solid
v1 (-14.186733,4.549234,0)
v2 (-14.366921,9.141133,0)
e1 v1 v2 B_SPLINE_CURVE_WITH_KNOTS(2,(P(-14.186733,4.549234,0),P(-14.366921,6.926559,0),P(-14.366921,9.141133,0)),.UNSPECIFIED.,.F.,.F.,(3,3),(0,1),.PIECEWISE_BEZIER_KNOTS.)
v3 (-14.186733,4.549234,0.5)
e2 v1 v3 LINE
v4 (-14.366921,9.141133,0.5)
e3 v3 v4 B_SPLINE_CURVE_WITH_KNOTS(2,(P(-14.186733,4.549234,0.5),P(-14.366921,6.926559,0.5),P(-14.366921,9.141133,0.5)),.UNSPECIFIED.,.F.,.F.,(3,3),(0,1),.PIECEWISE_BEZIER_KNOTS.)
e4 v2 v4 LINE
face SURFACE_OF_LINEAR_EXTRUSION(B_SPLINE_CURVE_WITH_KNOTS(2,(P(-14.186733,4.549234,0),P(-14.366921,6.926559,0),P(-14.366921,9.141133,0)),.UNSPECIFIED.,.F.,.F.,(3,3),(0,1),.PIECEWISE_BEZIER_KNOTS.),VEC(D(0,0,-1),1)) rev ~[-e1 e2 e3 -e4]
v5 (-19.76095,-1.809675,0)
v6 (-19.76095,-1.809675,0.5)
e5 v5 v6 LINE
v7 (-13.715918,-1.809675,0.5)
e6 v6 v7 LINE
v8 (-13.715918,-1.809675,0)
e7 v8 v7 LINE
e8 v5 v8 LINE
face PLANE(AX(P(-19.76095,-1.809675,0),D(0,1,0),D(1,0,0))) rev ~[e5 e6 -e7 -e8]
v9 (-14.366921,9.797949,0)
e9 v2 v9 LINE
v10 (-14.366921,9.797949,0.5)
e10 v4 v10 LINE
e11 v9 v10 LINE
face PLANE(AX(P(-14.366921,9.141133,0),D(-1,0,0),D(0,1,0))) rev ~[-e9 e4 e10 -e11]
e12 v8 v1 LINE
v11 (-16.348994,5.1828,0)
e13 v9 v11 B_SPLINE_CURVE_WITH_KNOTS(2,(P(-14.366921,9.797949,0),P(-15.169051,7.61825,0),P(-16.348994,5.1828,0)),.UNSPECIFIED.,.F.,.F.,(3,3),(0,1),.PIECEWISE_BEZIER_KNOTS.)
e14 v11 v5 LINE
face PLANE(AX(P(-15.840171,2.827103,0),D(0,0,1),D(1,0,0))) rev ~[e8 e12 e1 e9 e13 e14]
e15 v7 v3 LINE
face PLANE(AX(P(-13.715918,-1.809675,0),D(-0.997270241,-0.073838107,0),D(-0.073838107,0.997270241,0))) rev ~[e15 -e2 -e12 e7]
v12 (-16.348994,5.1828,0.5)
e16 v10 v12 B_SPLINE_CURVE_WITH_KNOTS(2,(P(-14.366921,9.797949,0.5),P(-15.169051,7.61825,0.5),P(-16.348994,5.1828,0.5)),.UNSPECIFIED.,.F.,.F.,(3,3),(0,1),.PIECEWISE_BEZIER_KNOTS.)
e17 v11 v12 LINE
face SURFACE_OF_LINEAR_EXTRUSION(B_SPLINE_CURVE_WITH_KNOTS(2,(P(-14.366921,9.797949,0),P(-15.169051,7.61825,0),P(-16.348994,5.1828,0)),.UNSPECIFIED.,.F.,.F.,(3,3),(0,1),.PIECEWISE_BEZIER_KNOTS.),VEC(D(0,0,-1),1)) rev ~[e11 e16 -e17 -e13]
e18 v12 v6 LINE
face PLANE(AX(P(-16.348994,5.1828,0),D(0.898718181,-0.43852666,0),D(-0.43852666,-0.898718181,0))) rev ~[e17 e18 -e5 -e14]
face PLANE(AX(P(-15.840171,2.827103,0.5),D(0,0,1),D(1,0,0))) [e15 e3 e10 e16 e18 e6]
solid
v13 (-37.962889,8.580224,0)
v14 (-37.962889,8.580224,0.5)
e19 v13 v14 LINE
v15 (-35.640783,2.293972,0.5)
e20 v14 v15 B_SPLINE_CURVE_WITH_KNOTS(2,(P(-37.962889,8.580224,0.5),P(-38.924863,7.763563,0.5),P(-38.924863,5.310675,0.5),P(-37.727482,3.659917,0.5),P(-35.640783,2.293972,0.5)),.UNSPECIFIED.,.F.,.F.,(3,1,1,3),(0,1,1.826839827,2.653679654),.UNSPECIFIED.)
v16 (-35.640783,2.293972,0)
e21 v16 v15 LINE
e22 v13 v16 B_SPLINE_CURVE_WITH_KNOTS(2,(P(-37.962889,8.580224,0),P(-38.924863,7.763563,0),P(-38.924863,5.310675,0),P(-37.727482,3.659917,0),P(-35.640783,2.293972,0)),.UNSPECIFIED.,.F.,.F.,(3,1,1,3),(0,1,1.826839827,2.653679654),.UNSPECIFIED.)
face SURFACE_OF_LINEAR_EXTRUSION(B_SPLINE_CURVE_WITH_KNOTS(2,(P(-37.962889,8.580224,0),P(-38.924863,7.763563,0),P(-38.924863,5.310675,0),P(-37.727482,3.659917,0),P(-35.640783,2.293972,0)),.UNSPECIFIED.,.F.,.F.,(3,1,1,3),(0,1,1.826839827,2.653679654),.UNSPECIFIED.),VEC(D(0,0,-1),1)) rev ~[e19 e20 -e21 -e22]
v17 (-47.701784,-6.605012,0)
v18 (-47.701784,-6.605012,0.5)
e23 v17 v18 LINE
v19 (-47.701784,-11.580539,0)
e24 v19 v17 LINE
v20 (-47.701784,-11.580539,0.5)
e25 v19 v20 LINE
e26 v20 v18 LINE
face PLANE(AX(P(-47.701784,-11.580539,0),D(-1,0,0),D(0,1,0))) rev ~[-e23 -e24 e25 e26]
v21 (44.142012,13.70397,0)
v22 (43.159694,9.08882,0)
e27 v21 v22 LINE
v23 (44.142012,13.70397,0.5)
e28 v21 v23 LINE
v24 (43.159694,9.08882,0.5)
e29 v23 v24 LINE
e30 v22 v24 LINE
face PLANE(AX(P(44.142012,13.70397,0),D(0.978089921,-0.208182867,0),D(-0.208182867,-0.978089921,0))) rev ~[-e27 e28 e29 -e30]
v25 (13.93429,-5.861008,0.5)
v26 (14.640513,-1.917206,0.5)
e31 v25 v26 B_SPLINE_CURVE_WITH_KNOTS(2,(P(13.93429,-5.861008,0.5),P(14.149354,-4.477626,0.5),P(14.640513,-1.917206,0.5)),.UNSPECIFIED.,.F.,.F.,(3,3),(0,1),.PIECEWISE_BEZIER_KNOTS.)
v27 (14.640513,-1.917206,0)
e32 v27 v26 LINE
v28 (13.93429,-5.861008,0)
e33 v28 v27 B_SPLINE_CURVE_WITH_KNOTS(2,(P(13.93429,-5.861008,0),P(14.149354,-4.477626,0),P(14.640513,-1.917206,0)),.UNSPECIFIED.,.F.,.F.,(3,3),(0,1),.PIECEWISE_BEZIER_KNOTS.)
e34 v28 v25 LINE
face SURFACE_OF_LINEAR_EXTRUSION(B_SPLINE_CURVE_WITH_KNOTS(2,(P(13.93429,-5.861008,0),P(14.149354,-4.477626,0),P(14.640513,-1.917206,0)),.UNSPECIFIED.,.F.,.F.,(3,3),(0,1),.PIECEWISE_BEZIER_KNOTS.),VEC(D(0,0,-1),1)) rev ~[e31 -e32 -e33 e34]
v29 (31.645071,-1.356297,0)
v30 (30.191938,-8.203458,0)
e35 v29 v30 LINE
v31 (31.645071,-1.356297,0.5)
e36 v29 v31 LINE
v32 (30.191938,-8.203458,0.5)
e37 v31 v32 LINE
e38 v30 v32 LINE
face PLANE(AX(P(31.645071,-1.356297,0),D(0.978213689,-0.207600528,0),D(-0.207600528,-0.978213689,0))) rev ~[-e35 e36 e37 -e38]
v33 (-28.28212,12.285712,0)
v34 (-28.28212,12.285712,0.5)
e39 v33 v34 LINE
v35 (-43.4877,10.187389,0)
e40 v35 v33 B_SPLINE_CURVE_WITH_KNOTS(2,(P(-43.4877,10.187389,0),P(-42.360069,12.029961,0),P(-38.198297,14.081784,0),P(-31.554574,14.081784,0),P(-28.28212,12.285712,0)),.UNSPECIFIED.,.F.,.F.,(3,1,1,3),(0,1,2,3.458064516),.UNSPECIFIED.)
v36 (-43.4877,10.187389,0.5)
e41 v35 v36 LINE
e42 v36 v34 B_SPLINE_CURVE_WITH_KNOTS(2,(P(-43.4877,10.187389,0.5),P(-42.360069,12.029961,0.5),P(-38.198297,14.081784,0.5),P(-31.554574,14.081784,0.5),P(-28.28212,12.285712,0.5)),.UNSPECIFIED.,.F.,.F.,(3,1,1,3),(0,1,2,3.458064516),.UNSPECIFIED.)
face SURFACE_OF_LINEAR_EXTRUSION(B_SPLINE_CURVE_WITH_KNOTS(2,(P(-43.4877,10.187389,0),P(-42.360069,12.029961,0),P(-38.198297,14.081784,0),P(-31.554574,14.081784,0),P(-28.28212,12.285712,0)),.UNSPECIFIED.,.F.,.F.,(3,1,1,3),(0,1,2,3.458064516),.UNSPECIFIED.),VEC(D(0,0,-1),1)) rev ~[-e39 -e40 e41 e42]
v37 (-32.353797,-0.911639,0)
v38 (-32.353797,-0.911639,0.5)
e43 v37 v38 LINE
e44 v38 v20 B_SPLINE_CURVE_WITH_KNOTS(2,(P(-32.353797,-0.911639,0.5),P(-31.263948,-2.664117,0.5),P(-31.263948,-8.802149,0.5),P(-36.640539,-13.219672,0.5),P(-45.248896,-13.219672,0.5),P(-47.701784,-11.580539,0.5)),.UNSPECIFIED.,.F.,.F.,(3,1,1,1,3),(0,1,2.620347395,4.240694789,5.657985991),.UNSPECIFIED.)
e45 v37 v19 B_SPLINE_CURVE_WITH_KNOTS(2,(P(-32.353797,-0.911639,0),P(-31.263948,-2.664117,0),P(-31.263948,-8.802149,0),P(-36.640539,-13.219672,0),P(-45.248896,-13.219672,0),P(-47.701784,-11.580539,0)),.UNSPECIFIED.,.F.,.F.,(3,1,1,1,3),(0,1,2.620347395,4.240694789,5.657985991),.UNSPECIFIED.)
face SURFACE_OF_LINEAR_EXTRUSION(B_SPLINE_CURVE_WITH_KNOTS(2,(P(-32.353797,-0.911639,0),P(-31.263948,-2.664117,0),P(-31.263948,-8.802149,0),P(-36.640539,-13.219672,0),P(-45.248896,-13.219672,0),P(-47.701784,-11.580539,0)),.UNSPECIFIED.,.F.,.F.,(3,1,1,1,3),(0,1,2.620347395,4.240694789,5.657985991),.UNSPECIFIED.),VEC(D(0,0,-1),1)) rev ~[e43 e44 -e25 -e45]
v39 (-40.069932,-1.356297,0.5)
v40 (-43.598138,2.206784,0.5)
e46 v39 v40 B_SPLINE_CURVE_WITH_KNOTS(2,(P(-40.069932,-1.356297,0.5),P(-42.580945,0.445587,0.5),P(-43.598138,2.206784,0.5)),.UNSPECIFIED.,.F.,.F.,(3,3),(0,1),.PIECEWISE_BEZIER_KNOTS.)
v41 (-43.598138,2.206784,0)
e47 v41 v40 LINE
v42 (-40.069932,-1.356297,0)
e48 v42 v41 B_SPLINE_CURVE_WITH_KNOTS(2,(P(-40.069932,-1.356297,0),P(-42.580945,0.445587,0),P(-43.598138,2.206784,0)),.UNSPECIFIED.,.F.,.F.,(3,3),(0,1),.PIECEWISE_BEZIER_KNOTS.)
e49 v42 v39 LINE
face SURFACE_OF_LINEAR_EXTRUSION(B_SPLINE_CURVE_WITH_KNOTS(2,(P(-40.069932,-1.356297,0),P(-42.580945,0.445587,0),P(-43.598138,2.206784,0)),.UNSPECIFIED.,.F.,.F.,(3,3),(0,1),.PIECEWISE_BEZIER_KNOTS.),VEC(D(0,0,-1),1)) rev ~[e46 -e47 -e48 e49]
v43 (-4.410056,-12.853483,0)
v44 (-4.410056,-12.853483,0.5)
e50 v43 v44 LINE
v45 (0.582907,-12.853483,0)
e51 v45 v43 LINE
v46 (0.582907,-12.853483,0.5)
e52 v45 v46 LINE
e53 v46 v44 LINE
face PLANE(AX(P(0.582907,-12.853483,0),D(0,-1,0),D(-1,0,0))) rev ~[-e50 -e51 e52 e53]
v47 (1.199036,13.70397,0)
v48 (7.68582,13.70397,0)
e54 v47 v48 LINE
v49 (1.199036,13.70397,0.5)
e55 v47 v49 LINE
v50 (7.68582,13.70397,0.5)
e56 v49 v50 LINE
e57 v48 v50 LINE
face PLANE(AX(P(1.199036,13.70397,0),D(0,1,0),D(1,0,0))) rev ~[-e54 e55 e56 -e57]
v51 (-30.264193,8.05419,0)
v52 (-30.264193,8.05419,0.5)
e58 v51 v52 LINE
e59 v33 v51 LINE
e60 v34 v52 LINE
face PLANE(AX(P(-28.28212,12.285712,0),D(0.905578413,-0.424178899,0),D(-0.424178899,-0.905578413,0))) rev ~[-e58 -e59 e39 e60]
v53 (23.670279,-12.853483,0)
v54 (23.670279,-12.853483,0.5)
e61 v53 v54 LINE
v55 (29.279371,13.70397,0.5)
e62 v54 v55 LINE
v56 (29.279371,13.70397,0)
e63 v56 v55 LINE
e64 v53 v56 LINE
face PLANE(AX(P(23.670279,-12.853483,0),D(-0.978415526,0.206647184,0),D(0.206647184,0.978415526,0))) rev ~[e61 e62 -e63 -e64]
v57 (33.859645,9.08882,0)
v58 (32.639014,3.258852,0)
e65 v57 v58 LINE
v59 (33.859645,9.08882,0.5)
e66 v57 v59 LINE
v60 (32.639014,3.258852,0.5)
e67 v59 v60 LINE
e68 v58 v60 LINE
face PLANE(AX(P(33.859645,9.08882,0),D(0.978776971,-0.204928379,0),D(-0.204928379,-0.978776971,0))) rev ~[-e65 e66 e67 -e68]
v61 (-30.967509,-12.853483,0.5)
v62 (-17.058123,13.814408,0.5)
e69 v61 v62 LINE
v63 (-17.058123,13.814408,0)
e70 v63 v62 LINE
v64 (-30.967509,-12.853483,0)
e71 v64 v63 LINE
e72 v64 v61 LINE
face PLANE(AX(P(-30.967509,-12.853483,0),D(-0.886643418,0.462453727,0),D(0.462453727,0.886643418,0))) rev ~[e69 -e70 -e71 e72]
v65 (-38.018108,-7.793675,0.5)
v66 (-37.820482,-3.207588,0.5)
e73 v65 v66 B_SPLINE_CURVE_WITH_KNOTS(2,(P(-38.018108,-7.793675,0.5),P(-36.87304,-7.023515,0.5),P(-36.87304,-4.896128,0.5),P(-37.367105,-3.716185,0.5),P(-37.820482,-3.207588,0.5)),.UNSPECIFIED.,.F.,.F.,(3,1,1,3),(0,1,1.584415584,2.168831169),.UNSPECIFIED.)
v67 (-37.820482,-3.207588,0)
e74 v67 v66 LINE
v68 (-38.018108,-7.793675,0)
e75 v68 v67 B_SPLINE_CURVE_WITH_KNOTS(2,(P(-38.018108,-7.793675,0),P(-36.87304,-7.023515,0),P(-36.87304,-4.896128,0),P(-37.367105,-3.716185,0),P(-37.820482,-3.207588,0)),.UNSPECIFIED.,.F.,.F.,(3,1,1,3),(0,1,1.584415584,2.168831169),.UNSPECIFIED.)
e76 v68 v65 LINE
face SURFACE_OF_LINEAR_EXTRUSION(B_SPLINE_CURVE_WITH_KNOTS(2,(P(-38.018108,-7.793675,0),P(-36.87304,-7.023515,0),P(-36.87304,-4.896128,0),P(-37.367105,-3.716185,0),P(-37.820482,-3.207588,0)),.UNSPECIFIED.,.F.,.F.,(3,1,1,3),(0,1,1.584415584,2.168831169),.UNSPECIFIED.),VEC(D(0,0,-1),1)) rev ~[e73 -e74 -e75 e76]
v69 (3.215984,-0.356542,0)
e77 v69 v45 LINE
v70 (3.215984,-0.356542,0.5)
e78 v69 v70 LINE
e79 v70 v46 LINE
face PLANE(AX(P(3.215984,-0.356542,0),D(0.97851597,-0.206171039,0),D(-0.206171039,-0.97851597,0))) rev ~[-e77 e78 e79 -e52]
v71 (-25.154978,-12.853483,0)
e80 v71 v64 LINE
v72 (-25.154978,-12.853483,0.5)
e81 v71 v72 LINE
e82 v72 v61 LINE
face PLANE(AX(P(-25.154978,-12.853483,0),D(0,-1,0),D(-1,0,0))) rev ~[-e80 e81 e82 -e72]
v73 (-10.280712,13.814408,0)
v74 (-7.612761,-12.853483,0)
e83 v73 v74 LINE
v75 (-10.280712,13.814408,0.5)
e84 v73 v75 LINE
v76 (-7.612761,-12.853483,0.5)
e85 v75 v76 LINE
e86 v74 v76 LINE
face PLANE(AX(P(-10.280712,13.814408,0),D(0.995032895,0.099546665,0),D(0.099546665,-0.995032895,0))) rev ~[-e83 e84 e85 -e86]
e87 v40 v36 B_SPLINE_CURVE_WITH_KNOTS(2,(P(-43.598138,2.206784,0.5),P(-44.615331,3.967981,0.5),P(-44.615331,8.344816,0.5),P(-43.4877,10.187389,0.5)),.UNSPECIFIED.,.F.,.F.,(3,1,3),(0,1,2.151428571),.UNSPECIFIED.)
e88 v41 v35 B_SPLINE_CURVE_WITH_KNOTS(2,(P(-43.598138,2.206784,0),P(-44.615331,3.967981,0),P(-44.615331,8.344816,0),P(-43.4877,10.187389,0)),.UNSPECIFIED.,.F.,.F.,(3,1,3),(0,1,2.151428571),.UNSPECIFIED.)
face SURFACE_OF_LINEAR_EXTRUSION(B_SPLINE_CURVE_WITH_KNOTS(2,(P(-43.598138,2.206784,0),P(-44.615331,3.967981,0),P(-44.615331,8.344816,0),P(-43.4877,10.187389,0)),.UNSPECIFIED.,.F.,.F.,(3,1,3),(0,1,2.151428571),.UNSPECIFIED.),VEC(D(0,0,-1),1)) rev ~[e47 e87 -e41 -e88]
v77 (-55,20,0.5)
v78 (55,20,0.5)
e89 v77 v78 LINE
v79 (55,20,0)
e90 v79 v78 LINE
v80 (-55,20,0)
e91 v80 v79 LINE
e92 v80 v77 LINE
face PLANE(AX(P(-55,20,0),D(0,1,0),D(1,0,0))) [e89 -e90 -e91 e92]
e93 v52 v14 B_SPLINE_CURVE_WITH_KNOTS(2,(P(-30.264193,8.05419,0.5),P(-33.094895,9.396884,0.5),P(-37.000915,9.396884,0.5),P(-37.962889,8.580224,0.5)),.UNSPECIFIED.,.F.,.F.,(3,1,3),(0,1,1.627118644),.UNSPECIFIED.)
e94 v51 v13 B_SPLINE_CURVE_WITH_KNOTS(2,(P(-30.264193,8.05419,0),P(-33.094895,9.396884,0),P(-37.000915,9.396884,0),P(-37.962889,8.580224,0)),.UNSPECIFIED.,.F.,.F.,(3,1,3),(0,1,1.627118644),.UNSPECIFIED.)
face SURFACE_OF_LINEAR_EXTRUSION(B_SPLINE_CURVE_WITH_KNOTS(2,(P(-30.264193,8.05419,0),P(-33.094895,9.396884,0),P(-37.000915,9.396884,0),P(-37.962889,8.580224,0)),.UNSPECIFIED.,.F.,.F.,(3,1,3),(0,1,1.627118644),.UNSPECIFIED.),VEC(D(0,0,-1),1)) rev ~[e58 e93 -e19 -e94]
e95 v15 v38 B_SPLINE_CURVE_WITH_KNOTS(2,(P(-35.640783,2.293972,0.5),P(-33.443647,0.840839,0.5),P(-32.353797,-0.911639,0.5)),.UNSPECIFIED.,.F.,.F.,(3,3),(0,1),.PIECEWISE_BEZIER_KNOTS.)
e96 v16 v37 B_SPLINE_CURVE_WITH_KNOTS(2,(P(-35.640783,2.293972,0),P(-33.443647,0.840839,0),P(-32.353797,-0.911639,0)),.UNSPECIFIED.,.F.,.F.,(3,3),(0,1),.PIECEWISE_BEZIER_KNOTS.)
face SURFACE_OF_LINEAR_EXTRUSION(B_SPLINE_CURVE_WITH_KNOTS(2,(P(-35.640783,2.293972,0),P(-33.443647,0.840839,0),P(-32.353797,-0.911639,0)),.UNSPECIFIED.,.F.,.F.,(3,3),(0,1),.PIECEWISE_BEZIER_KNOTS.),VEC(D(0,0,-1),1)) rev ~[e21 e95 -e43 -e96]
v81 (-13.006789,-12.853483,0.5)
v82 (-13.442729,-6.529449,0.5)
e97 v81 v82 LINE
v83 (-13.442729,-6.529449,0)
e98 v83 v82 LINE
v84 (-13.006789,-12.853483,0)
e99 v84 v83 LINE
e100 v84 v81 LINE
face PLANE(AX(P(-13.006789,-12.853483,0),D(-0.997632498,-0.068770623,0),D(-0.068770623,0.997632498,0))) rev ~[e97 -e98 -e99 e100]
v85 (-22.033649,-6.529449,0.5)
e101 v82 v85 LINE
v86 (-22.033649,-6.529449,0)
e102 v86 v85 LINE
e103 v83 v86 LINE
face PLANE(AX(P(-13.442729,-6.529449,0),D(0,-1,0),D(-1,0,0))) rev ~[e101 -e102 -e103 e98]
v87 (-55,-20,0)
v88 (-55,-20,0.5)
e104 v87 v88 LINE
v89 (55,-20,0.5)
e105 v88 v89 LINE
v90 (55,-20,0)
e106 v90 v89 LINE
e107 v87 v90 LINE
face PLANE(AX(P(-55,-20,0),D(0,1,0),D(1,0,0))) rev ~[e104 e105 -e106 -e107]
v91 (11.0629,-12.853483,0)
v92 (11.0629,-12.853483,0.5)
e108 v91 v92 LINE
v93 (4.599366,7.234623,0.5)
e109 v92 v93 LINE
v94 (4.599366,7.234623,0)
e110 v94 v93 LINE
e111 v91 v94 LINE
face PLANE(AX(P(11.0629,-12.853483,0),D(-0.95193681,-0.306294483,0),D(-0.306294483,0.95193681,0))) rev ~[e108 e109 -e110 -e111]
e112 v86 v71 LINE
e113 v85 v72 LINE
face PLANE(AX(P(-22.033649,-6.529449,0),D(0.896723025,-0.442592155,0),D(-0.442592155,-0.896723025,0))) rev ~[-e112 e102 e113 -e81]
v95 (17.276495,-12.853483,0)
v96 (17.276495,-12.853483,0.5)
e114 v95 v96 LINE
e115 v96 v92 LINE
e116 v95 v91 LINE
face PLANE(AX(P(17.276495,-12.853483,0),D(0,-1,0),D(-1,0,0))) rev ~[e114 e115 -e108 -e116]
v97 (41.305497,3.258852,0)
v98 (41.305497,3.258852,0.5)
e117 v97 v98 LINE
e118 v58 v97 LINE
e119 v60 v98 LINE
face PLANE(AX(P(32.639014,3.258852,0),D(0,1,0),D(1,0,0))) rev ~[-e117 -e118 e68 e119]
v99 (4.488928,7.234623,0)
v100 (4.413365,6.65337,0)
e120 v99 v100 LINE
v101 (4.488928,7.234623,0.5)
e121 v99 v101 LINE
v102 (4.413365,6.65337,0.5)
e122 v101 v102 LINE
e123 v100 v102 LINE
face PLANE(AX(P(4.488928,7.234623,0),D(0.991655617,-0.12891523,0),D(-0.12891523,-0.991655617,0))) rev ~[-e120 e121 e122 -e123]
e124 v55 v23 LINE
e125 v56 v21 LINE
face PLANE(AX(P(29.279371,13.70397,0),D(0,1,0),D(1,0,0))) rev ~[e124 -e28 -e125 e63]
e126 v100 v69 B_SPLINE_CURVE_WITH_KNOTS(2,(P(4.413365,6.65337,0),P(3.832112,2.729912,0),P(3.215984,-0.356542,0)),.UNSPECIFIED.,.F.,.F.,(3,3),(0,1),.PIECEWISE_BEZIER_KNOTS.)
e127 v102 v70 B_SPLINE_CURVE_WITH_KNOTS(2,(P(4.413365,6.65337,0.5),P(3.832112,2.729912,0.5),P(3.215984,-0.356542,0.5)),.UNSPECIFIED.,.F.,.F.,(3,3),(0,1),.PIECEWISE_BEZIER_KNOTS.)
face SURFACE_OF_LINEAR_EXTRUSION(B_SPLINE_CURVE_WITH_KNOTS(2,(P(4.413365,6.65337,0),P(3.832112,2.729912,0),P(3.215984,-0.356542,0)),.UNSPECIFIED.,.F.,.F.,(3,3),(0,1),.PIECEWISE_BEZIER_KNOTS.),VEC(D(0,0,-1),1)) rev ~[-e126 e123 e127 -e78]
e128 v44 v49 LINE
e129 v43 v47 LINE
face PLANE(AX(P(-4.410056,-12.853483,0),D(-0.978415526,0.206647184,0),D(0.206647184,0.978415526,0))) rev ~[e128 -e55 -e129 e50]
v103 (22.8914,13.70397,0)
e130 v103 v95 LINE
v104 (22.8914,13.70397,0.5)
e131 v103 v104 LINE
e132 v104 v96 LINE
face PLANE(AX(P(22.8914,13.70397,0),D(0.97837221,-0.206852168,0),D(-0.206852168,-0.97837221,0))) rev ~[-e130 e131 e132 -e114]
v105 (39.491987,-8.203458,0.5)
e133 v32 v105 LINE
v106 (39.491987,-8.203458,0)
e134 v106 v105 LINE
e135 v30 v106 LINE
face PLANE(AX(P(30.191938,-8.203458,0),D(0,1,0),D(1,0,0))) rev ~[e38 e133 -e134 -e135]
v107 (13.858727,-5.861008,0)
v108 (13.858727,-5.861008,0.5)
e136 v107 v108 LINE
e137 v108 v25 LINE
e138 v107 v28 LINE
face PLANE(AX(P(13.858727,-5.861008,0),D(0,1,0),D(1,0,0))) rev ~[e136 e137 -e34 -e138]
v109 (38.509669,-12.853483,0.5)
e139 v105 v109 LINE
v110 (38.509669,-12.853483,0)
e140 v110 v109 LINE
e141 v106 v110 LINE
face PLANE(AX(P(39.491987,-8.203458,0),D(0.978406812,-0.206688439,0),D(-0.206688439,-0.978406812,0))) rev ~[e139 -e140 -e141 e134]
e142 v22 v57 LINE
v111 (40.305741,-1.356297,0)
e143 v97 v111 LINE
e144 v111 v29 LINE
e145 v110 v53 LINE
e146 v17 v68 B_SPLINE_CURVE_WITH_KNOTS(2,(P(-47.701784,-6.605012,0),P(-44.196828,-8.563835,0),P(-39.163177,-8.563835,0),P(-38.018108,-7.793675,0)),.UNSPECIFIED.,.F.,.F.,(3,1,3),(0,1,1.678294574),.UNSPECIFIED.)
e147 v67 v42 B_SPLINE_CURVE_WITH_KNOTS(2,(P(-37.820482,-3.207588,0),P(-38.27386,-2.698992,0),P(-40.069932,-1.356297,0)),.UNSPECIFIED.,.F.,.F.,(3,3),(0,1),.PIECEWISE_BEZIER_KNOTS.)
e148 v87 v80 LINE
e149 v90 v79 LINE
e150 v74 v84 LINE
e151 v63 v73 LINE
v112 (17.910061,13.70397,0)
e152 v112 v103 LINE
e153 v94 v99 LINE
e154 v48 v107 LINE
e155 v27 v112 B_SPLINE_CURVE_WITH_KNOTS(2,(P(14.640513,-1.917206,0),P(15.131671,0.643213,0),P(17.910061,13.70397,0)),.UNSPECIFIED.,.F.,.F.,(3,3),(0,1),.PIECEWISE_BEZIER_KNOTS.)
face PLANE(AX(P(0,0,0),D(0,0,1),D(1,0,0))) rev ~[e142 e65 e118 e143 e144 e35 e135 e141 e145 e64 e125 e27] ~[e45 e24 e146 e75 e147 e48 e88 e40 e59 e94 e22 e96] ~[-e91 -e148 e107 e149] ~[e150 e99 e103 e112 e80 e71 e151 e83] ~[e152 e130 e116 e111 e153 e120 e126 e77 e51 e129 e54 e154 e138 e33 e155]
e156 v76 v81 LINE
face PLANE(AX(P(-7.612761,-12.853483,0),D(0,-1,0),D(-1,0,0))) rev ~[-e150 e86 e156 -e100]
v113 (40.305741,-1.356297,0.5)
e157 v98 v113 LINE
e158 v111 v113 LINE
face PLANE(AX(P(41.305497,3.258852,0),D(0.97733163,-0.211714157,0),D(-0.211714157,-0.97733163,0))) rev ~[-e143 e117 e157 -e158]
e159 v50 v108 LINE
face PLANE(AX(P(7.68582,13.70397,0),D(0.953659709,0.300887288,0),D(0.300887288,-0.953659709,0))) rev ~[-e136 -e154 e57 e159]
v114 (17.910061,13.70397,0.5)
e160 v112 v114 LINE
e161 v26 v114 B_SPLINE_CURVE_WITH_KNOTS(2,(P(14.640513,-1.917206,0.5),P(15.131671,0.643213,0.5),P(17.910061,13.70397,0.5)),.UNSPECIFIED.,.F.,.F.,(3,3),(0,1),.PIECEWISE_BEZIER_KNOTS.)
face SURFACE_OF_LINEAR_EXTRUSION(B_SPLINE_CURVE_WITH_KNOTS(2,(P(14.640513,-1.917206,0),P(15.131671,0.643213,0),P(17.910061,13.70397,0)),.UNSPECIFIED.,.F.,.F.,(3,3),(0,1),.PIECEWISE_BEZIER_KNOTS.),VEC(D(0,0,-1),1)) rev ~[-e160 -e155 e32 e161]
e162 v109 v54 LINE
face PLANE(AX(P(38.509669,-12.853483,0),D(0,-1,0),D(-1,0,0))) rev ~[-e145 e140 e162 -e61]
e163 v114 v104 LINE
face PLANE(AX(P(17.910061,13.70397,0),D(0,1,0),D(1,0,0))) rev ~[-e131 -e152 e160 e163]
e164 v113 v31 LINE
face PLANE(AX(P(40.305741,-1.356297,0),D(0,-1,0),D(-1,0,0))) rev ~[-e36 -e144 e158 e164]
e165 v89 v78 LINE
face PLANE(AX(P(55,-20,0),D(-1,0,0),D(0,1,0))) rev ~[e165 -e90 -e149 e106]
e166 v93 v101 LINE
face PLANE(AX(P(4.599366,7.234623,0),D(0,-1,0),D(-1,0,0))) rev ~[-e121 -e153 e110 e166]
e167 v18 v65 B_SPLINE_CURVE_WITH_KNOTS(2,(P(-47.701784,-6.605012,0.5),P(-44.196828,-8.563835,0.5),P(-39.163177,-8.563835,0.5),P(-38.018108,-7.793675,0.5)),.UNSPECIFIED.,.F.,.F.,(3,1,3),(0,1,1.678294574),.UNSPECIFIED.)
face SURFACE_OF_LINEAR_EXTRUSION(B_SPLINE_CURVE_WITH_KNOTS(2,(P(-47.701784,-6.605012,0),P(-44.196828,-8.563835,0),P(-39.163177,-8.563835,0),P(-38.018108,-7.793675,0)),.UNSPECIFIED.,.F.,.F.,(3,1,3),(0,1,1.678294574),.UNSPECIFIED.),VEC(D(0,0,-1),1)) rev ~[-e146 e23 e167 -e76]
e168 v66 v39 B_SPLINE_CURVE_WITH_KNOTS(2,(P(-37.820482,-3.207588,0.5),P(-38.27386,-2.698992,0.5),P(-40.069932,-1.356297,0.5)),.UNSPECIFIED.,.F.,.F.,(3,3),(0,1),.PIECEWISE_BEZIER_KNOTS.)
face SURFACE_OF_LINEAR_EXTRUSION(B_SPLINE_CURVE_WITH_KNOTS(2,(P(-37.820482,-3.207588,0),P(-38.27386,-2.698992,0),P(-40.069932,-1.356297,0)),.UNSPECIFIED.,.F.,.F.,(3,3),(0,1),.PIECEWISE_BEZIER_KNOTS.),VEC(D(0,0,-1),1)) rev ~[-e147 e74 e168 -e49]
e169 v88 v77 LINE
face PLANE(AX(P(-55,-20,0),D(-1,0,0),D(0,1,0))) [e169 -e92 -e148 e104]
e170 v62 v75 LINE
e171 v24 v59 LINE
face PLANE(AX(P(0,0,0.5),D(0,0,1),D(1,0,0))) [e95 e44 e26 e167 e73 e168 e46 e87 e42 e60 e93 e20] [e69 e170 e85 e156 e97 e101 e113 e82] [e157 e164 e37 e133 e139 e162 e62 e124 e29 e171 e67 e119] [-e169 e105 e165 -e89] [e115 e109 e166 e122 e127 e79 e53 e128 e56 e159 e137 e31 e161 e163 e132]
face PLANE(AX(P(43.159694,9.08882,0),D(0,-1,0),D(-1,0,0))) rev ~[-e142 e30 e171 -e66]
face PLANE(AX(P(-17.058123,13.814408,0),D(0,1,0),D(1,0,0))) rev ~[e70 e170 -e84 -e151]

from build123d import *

# Parameters (mm, degrees)
F0_W     = 110
F0_H     = 40
F1_DEPTH = 0.5


# Not quite as in the source:
# - a feature names something its author has since deleted; it is built from what else it names


with BuildPart() as f1:
    # F0 (on Top) → F1 (new body)
    with BuildSketch(Plane.XY):
        Rectangle(F0_W, F0_H)
        with BuildLine():
            add(Edge.make_bspline(
                [(-32.3537972674, -0.9116386363), (-31.2639477814, -2.6641166099), (-31.2639477814, -5.0065664386)],
                knots=[0, 0, 0, 1, 1, 1], degree=2))
            add(Edge.make_bspline(
                [(-31.2639477814, -5.0065664386), (-31.2639477814, -8.8021489153), (-33.9522431803, -11.0109105404)],
                knots=[0, 0, 0, 1, 1, 1], degree=2))
            add(Edge.make_bspline(
                [(-33.9522431803, -11.0109105404), (-36.6405385792, -13.2196721655), (-41.2324377471, -13.2196721655)],
                knots=[0, 0, 0, 1, 1, 1], degree=2))
            add(Edge.make_bspline(
                [(-41.2324377471, -13.2196721655), (-45.2488963864, -13.2196721655), (-47.7017842963, -11.5805385384)],
                knots=[0, 0, 0, 1, 1, 1], degree=2))
            Line((-47.7017842963, -11.5805385384), (-47.7017842963, -6.6050123515))
            add(Edge.make_bspline(
                [(-47.7017842963, -6.6050123515), (-44.1968283492, -8.563835161), (-41.1975625636, -8.563835161)],
                knots=[0, 0, 0, 1, 1, 1], degree=2))
            add(Edge.make_bspline(
                [(-41.1975625636, -8.563835161), (-39.1631768563, -8.563835161), (-38.0181083296, -7.7936748576)],
                knots=[0, 0, 0, 1, 1, 1], degree=2))
            add(Edge.make_bspline(
                [(-38.0181083296, -7.7936748576), (-36.8730398029, -7.0235145541), (-36.8730398029, -5.6808199873)],
                knots=[0, 0, 0, 1, 1, 1], degree=2))
            add(Edge.make_bspline(
                [(-36.8730398029, -5.6808199873), (-36.8730398029, -4.8961283573), (-37.1200723531, -4.3061565022)],
                knots=[0, 0, 0, 1, 1, 1], degree=2))
            add(Edge.make_bspline(
                [(-37.1200723531, -4.3061565022), (-37.3671049033, -3.7161846471), (-37.8204822895, -3.2075882203)],
                knots=[0, 0, 0, 1, 1, 1], degree=2))
            add(Edge.make_bspline(
                [(-37.8204822895, -3.2075882203), (-38.2738596757, -2.6989917934), (-40.0699316287, -1.3562972266)],
                knots=[0, 0, 0, 1, 1, 1], degree=2))
            add(Edge.make_bspline(
                [(-40.0699316287, -1.3562972266), (-42.5809448445, 0.445587257), (-43.5981376982, 2.2067840264)],
                knots=[0, 0, 0, 1, 1, 1], degree=2))
            add(Edge.make_bspline(
                [(-43.5981376982, 2.2067840264), (-44.6153305518, 3.9679807959), (-44.6153305518, 6.0023665032)],
                knots=[0, 0, 0, 1, 1, 1], degree=2))
            add(Edge.make_bspline(
                [(-44.6153305518, 6.0023665032), (-44.6153305518, 8.3448163319), (-43.4876996169, 10.1873885296)],
                knots=[0, 0, 0, 1, 1, 1], degree=2))
            add(Edge.make_bspline(
                [(-43.4876996169, 10.1873885296), (-42.360068682, 12.0299607274), (-40.27918273, 13.0558723769)],
                knots=[0, 0, 0, 1, 1, 1], degree=2))
            add(Edge.make_bspline(
                [(-40.27918273, 13.0558723769), (-38.198296778, 14.0817840264), (-35.4954700526, 14.0817840264)],
                knots=[0, 0, 0, 1, 1, 1], degree=2))
            add(Edge.make_bspline(
                [(-35.4954700526, 14.0817840264), (-31.554574311, 14.0817840264), (-28.2821195875, 12.2857120734)],
                knots=[0, 0, 0, 1, 1, 1], degree=2))
            Line((-28.2821195875, 12.2857120734), (-30.2641925195, 8.0541898022))
            add(Edge.make_bspline(
                [(-30.2641925195, 8.0541898022), (-33.0948949179, 9.3968843691), (-35.4954700526, 9.3968843691)],
                knots=[0, 0, 0, 1, 1, 1], degree=2))
            add(Edge.make_bspline(
                [(-35.4954700526, 9.3968843691), (-37.0009154759, 9.3968843691), (-37.962889289, 8.5802238208)],
                knots=[0, 0, 0, 1, 1, 1], degree=2))
            add(Edge.make_bspline(
                [(-37.962889289, 8.5802238208), (-38.924863102, 7.7635632726), (-38.924863102, 6.4208687058)],
                knots=[0, 0, 0, 1, 1, 1], degree=2))
            add(Edge.make_bspline(
                [(-38.924863102, 6.4208687058), (-38.924863102, 5.3106753627), (-38.326172451, 4.4852960186)],
                knots=[0, 0, 0, 1, 1, 1], degree=2))
            add(Edge.make_bspline(
                [(-38.326172451, 4.4852960186), (-37.7274818, 3.6599166745), (-35.6407833174, 2.2939719853)],
                knots=[0, 0, 0, 1, 1, 1], degree=2))
            add(Edge.make_bspline(
                [(-35.6407833174, 2.2939719853), (-33.4436467535, 0.8408393372), (-32.3537972674, -0.9116386363)],
                knots=[0, 0, 0, 1, 1, 1], degree=2))
        make_face(mode=Mode.SUBTRACT)
        Polygon((-13.0067891911, -12.8534827381), (-13.4427289855, -6.5294494538), (-22.0336492009, -6.5294494538), (-25.1549781289, -12.8534827381), (-30.9675087212, -12.8534827381), (-17.0581230139, 13.8144076192), (-10.2807123433, 13.8144076192), (-7.6127608014, -12.8534827381), align=None, mode=Mode.SUBTRACT)
        with BuildLine():
            Line((22.8913997468, 13.7039695379), (17.2764951946, -12.8534827381))
            Line((17.2764951946, -12.8534827381), (11.0628999915, -12.8534827381))
            Line((11.0628999915, -12.8534827381), (4.5993659729, 7.2346229887))
            Line((4.5993659729, 7.2346229887), (4.4889278916, 7.2346229887))
            Line((4.4889278916, 7.2346229887), (4.4133649939, 6.6533699295))
            add(Edge.make_bspline(
                [(4.4133649939, 6.6533699295), (3.8321119347, 2.7299117797), (3.2159836919, -0.3565419648)],
                knots=[0, 0, 0, 1, 1, 1], degree=2))
            Line((3.2159836919, -0.3565419648), (0.5829073336, -12.8534827381))
            Line((0.5829073336, -12.8534827381), (-4.4100564451, -12.8534827381))
            Line((-4.4100564451, -12.8534827381), (1.1990355764, 13.7039695379))
            Line((1.1990355764, 13.7039695379), (7.6858197174, 13.7039695379))
            Line((7.6858197174, 13.7039695379), (13.8587272064, -5.8610084356))
            Line((13.8587272064, -5.8610084356), (13.9342901041, -5.8610084356))
            add(Edge.make_bspline(
                [(13.9342901041, -5.8610084356), (14.149353736, -4.4776261547), (14.640512571, -1.9172064288)],
                knots=[0, 0, 0, 1, 1, 1], degree=2))
            add(Edge.make_bspline(
                [(14.640512571, -1.9172064288), (15.1316714061, 0.6432132971), (17.9100610292, 13.7039695379)],
                knots=[0, 0, 0, 1, 1, 1], degree=2))
            Line((17.9100610292, 13.7039695379), (22.8913997468, 13.7039695379))
        make_face(mode=Mode.SUBTRACT)
        Polygon((39.4919871183, -8.2034582643), (38.5096694482, -12.8534827381), (23.6702788461, -12.8534827381), (29.2793708677, 13.7039695379), (44.1420115921, 13.7039695379), (43.159693922, 9.0888202477), (33.8596449744, 9.0888202477), (32.63901355, 3.2588520636), (41.3054966631, 3.2588520636), (40.3057414012, -1.3562972266), (31.6450708187, -1.3562972266), (30.1919381706, -8.2034582643), align=None, mode=Mode.SUBTRACT)
    extrude(amount=F1_DEPTH)


with BuildPart() as f1b:
    # F0 (on Top) → F1, piece 2 (new body)
    with BuildSketch(Plane.XY):
        with BuildLine():
            Line((-19.7609497393, -1.8096746128), (-13.7159179233, -1.8096746128))
            Line((-13.7159179233, -1.8096746128), (-14.1867329013, 4.5492338551))
            add(Edge.make_bspline(
                [(-14.1867329013, 4.5492338551), (-14.3669213497, 6.9265588673), (-14.3669213497, 9.141133023)],
                knots=[0, 0, 0, 1, 1, 1], degree=2))
            Line((-14.3669213497, 9.141133023), (-14.3669213497, 9.7979489799))
            add(Edge.make_bspline(
                [(-14.3669213497, 9.7979489799), (-15.1690505714, 7.6182500078), (-16.3489942816, 5.1827996897)],
                knots=[0, 0, 0, 1, 1, 1], degree=2))
            Line((-16.3489942816, 5.1827996897), (-19.7609497393, -1.8096746128))
        make_face()
    extrude(amount=F1_DEPTH)


solid = Compound([f1.part, f1b.part])
